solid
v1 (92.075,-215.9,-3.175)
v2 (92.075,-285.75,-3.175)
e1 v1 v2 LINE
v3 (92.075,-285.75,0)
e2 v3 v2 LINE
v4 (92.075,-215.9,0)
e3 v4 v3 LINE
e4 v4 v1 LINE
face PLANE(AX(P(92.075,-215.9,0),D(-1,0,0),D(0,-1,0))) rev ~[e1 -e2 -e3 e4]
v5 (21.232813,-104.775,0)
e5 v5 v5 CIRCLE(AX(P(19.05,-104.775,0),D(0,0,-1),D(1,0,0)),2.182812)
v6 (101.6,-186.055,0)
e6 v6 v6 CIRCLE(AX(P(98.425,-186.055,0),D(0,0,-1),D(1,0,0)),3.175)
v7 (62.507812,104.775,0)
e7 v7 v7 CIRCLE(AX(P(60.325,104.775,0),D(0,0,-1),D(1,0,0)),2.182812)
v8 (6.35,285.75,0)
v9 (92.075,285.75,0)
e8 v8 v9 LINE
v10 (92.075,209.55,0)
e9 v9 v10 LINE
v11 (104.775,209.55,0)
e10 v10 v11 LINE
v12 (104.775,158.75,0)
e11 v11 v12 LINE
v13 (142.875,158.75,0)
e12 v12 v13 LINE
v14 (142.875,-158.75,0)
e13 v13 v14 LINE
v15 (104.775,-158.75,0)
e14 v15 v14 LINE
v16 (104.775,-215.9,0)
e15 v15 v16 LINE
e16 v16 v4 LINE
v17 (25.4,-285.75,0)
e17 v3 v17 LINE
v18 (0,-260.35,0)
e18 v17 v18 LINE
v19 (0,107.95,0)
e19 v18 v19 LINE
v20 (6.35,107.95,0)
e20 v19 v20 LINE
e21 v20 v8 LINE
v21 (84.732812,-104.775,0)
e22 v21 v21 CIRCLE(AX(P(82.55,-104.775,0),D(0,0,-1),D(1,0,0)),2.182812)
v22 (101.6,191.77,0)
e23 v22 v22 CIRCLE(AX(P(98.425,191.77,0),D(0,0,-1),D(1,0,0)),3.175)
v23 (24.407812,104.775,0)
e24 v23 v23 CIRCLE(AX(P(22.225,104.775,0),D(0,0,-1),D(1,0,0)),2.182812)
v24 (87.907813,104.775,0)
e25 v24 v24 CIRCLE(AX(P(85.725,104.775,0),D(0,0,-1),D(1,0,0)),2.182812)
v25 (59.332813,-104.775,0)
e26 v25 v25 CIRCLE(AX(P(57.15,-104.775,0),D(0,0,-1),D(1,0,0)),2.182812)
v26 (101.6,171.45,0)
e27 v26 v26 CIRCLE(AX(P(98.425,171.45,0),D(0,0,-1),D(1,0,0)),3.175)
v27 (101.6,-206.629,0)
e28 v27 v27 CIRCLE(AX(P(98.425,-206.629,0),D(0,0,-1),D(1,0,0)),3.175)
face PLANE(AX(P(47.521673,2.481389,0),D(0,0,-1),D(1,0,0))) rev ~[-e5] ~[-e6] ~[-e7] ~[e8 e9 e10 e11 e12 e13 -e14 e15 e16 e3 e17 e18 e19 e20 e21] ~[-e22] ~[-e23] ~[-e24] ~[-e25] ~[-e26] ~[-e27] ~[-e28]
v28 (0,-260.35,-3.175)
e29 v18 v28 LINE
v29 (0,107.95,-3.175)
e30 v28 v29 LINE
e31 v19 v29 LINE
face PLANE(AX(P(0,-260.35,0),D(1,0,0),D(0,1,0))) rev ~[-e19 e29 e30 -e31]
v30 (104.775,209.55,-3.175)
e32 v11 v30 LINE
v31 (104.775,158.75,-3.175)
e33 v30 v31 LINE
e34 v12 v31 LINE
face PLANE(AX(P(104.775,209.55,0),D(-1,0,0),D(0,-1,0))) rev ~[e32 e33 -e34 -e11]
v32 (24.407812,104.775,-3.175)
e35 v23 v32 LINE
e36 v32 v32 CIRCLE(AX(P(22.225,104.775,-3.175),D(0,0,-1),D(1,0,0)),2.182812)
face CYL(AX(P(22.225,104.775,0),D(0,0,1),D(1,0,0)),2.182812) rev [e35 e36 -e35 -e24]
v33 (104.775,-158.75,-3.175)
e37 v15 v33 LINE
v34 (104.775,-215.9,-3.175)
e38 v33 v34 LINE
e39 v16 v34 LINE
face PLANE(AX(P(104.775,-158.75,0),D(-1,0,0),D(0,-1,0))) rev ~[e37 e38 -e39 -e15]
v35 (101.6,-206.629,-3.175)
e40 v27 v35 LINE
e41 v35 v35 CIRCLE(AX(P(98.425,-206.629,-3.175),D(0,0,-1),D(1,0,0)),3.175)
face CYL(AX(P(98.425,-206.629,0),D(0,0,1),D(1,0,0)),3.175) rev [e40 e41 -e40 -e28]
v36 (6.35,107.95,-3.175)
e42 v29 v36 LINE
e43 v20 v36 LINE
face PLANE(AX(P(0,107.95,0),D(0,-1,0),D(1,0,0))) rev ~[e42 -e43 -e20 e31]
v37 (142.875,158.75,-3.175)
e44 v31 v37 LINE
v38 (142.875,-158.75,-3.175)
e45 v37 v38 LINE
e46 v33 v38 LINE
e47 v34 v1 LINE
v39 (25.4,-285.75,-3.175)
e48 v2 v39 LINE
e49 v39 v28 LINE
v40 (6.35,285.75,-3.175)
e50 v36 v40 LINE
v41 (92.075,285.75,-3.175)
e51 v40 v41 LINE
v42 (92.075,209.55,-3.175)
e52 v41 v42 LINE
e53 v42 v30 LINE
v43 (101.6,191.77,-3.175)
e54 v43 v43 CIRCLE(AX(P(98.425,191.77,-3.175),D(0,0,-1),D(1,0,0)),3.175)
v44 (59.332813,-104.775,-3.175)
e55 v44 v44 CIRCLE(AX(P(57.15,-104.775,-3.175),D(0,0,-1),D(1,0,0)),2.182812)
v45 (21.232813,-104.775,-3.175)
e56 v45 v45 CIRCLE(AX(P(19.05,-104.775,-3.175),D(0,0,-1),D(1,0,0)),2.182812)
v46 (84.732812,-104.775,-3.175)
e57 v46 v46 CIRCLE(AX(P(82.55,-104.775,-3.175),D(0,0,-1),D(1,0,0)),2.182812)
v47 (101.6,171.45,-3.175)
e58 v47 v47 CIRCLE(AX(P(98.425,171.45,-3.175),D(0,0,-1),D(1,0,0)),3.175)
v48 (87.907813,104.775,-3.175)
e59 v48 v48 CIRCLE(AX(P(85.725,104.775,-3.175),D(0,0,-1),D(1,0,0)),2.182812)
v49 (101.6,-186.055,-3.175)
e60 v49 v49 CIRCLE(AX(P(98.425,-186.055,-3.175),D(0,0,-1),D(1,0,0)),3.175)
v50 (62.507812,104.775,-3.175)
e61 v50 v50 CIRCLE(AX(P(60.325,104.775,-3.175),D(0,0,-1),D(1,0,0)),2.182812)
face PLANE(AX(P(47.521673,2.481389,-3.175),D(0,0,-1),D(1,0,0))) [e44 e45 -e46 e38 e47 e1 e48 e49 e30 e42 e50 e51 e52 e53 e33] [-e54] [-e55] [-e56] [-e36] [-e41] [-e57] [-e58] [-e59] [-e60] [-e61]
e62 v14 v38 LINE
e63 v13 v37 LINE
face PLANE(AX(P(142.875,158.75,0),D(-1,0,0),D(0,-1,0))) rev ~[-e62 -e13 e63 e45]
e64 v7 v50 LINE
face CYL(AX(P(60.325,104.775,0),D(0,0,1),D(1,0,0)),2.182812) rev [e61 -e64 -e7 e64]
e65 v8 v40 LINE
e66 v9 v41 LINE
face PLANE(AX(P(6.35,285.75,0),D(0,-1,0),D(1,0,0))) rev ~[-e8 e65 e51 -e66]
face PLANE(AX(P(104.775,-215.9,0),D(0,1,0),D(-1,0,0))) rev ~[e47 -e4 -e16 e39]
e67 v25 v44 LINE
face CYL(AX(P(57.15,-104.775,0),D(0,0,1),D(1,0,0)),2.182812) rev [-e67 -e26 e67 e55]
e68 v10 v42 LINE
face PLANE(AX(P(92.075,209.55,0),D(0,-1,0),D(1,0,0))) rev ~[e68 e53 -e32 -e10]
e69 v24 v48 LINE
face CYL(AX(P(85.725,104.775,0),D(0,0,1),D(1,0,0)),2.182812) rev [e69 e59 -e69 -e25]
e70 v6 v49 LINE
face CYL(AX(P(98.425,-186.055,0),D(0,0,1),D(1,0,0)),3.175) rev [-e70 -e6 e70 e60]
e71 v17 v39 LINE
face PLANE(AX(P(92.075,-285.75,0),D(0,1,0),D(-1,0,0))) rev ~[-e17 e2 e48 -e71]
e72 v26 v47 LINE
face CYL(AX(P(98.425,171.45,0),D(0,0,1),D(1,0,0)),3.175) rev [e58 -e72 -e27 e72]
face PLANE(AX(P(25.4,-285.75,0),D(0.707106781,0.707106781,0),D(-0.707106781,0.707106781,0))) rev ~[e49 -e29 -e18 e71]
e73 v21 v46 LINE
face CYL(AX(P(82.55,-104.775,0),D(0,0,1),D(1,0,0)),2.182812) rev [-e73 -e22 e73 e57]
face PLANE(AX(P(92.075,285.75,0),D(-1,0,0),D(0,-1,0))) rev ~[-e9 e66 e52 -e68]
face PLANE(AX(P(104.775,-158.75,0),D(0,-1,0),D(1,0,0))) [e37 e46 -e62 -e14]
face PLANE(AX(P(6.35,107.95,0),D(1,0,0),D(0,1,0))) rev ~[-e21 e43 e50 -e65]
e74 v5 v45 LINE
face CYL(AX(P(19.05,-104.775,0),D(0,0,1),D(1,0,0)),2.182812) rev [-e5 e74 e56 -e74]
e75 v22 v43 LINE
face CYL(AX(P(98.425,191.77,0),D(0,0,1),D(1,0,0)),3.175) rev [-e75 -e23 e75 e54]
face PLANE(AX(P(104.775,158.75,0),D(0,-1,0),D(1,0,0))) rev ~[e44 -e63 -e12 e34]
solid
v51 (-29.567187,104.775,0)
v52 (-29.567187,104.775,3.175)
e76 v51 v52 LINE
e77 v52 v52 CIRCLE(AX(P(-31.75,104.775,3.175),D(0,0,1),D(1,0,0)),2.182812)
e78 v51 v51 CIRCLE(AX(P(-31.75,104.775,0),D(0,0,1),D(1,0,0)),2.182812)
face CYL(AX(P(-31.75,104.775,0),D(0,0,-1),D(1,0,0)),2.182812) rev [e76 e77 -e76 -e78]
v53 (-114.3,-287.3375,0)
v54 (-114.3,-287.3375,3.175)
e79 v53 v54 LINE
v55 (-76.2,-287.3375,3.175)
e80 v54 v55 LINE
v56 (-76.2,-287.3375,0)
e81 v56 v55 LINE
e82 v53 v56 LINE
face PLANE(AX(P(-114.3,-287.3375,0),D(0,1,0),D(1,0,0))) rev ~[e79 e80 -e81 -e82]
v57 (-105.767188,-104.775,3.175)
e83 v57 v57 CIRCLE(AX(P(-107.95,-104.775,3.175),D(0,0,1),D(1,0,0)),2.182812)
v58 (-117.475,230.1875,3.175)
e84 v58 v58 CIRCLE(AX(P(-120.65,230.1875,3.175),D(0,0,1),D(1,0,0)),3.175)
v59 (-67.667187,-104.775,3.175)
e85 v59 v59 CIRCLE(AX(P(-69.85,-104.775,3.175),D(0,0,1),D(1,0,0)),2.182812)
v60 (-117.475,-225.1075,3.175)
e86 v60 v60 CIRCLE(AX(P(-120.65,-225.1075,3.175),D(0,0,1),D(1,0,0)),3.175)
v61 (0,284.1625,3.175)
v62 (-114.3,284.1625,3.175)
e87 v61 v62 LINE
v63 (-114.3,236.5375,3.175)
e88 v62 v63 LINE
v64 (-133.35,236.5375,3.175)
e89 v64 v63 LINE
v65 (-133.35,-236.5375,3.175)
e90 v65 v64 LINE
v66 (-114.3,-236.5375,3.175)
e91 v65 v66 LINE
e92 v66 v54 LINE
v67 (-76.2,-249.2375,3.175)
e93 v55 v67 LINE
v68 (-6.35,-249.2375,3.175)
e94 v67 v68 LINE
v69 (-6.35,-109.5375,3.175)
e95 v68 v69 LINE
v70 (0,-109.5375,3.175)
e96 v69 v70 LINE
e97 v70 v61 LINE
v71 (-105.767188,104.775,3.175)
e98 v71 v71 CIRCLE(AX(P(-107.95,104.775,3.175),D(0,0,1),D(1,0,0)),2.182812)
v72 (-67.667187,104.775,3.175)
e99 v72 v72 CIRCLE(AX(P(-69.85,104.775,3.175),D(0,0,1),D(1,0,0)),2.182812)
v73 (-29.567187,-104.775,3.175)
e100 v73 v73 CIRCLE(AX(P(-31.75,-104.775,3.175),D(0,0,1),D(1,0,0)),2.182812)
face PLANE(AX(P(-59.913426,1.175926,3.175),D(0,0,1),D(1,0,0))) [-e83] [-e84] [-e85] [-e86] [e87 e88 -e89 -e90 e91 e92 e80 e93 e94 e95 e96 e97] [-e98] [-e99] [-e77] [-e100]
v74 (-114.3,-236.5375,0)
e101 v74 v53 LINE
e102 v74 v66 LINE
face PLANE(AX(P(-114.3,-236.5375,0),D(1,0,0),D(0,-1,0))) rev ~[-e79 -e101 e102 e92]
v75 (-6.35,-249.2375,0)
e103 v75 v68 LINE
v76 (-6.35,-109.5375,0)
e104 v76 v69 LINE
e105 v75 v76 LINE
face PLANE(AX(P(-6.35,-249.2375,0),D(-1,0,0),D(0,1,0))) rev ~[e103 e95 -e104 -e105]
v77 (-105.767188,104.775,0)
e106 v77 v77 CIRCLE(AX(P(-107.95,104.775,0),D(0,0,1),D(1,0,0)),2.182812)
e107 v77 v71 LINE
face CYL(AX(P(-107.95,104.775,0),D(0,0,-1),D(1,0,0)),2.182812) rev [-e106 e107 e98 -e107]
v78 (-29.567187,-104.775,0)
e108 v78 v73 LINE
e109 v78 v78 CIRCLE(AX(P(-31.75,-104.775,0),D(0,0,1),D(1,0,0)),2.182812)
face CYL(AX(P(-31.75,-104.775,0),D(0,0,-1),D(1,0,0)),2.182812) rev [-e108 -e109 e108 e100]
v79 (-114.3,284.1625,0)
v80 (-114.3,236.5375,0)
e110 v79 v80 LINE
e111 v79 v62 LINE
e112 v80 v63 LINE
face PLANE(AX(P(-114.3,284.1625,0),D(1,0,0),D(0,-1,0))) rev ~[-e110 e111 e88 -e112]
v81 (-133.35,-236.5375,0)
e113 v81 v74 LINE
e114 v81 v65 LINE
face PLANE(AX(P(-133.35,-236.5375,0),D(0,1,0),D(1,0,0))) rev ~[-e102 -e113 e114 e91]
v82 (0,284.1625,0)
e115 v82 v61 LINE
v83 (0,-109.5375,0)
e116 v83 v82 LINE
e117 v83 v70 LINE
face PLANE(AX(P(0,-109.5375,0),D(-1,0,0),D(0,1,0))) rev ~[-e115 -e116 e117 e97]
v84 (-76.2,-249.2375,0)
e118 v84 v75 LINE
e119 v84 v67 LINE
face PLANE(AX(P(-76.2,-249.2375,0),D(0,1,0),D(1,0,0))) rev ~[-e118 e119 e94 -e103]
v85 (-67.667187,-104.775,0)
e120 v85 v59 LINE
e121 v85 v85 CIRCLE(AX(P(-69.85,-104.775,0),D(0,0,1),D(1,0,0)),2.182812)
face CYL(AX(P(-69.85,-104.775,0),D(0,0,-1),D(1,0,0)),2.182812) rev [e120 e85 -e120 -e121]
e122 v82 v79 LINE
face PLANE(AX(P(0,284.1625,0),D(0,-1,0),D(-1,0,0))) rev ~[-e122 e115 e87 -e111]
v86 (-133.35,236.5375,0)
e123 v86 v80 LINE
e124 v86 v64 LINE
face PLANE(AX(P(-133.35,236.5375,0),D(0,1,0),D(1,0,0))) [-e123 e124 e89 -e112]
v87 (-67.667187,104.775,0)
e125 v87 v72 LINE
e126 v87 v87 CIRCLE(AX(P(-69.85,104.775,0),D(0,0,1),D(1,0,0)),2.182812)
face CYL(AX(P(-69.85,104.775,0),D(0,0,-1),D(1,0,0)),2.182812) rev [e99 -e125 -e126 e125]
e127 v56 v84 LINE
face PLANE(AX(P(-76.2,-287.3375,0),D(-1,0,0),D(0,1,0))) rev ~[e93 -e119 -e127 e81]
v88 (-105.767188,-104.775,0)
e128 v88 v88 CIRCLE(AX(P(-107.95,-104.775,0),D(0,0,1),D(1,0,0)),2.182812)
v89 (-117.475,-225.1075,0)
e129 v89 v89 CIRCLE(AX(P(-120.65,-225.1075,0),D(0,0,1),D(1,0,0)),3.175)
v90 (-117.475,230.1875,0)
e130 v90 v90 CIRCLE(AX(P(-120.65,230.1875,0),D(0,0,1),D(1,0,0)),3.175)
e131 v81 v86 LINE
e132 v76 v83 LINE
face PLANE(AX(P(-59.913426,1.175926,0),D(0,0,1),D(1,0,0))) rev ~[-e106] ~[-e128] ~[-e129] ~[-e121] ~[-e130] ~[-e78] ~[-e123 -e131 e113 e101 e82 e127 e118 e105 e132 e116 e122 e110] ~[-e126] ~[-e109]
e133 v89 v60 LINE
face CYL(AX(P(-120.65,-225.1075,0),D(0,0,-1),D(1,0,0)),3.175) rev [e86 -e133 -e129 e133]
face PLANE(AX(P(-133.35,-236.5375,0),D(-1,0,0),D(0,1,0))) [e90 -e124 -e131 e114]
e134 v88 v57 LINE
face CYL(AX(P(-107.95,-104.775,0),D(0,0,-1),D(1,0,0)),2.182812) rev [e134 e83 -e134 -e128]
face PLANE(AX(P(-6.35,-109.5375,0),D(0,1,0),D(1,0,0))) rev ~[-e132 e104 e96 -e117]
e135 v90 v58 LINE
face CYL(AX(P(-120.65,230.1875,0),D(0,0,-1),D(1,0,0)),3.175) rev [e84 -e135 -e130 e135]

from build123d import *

# Parameters (mm, degrees)
F0_R     = 2.1828125
F0_W     = 19.05
F0_H     = 473.075
F0_R_2   = 3.175
F1_DEPTH = 3.175
F2_R     = 2.1828125
F2_R_2   = 3.175
F2_W     = 38.1
F2_H     = 158.75
F3_DEPTH = 3.175


# Not quite as in the source:
# - a feature names something its author has since deleted; it is built from what else it names


with BuildPart() as f1:
    # F0 (on Top) → F1 (new body)
    with BuildSketch(Plane.XY):
        Polygon((0, 284.1625), (-114.3, 284.1625), (-114.3, 236.5375), (-114.3, -236.5375), (-114.3, -287.3375), (-76.2, -287.3375), (-76.2, -249.2375), (-6.35, -249.2375), (-6.35, -109.5375), (0, -109.5375), align=None)
        with Locations((-107.95, -104.775)):
            Circle(F0_R, mode=Mode.SUBTRACT)
        with Locations((-69.85, -104.775)):
            Circle(F0_R, mode=Mode.SUBTRACT)
        with Locations((-31.75, -104.775)):
            Circle(F0_R, mode=Mode.SUBTRACT)
        with Locations((-107.95, 104.775)):
            Circle(F0_R, mode=Mode.SUBTRACT)
        with Locations((-69.85, 104.775)):
            Circle(F0_R, mode=Mode.SUBTRACT)
        with Locations((-31.75, 104.775)):
            Circle(F0_R, mode=Mode.SUBTRACT)
        with Locations((-123.825, 0)):
            Rectangle(F0_W, F0_H)
        with Locations((-120.65, -225.1075)):
            Circle(F0_R_2, mode=Mode.SUBTRACT)
        with Locations((-120.65, 230.1875)):
            Circle(F0_R_2, mode=Mode.SUBTRACT)
    extrude(amount=F1_DEPTH)


with BuildPart() as f3:
    # F2 (on face) → F3 (new body)
    with BuildSketch(Plane(origin=(0, 0, 0), x_dir=(1, 0, 0), z_dir=(0, 0, -1))):
        Polygon((6.35, -107.95), (6.35, -285.75), (92.075, -285.75), (92.075, -209.55), (92.075, 0), (92.075, 215.9), (92.075, 285.75), (25.4, 285.75), (0, 260.35), (0, 109.5375), (0, -107.95), align=None)
        with Locations((22.225, -104.775)):
            Circle(F2_R, mode=Mode.SUBTRACT)
        with Locations((60.325, -104.775)):
            Circle(F2_R, mode=Mode.SUBTRACT)
        with Locations((85.725, -104.775)):
            Circle(F2_R, mode=Mode.SUBTRACT)
        with Locations((19.05, 104.775)):
            Circle(F2_R, mode=Mode.SUBTRACT)
        with Locations((57.15, 104.775)):
            Circle(F2_R, mode=Mode.SUBTRACT)
        with Locations((82.55, 104.775)):
            Circle(F2_R, mode=Mode.SUBTRACT)
        Polygon((92.075, 0), (92.075, -209.55), (104.775, -209.55), (104.775, -158.75), (104.775, 0), align=None)
        with Locations((98.425, -191.77)):
            Circle(F2_R_2, mode=Mode.SUBTRACT)
        with Locations((98.425, -171.45)):
            Circle(F2_R_2, mode=Mode.SUBTRACT)
        Polygon((92.075, 215.9), (92.075, 0), (104.775, 0), (104.775, 158.75), (104.775, 215.9), align=None)
        with Locations((98.425, 186.055)):
            Circle(F2_R_2, mode=Mode.SUBTRACT)
        with Locations((98.425, 206.629)):
            Circle(F2_R_2, mode=Mode.SUBTRACT)
        with Locations((123.825, -79.375)):
            Rectangle(F2_W, F2_H)
        with Locations((123.825, 79.375)):
            Rectangle(F2_W, F2_H)
    extrude(amount=F3_DEPTH)


solid = Compound([f1.part, f3.part])
